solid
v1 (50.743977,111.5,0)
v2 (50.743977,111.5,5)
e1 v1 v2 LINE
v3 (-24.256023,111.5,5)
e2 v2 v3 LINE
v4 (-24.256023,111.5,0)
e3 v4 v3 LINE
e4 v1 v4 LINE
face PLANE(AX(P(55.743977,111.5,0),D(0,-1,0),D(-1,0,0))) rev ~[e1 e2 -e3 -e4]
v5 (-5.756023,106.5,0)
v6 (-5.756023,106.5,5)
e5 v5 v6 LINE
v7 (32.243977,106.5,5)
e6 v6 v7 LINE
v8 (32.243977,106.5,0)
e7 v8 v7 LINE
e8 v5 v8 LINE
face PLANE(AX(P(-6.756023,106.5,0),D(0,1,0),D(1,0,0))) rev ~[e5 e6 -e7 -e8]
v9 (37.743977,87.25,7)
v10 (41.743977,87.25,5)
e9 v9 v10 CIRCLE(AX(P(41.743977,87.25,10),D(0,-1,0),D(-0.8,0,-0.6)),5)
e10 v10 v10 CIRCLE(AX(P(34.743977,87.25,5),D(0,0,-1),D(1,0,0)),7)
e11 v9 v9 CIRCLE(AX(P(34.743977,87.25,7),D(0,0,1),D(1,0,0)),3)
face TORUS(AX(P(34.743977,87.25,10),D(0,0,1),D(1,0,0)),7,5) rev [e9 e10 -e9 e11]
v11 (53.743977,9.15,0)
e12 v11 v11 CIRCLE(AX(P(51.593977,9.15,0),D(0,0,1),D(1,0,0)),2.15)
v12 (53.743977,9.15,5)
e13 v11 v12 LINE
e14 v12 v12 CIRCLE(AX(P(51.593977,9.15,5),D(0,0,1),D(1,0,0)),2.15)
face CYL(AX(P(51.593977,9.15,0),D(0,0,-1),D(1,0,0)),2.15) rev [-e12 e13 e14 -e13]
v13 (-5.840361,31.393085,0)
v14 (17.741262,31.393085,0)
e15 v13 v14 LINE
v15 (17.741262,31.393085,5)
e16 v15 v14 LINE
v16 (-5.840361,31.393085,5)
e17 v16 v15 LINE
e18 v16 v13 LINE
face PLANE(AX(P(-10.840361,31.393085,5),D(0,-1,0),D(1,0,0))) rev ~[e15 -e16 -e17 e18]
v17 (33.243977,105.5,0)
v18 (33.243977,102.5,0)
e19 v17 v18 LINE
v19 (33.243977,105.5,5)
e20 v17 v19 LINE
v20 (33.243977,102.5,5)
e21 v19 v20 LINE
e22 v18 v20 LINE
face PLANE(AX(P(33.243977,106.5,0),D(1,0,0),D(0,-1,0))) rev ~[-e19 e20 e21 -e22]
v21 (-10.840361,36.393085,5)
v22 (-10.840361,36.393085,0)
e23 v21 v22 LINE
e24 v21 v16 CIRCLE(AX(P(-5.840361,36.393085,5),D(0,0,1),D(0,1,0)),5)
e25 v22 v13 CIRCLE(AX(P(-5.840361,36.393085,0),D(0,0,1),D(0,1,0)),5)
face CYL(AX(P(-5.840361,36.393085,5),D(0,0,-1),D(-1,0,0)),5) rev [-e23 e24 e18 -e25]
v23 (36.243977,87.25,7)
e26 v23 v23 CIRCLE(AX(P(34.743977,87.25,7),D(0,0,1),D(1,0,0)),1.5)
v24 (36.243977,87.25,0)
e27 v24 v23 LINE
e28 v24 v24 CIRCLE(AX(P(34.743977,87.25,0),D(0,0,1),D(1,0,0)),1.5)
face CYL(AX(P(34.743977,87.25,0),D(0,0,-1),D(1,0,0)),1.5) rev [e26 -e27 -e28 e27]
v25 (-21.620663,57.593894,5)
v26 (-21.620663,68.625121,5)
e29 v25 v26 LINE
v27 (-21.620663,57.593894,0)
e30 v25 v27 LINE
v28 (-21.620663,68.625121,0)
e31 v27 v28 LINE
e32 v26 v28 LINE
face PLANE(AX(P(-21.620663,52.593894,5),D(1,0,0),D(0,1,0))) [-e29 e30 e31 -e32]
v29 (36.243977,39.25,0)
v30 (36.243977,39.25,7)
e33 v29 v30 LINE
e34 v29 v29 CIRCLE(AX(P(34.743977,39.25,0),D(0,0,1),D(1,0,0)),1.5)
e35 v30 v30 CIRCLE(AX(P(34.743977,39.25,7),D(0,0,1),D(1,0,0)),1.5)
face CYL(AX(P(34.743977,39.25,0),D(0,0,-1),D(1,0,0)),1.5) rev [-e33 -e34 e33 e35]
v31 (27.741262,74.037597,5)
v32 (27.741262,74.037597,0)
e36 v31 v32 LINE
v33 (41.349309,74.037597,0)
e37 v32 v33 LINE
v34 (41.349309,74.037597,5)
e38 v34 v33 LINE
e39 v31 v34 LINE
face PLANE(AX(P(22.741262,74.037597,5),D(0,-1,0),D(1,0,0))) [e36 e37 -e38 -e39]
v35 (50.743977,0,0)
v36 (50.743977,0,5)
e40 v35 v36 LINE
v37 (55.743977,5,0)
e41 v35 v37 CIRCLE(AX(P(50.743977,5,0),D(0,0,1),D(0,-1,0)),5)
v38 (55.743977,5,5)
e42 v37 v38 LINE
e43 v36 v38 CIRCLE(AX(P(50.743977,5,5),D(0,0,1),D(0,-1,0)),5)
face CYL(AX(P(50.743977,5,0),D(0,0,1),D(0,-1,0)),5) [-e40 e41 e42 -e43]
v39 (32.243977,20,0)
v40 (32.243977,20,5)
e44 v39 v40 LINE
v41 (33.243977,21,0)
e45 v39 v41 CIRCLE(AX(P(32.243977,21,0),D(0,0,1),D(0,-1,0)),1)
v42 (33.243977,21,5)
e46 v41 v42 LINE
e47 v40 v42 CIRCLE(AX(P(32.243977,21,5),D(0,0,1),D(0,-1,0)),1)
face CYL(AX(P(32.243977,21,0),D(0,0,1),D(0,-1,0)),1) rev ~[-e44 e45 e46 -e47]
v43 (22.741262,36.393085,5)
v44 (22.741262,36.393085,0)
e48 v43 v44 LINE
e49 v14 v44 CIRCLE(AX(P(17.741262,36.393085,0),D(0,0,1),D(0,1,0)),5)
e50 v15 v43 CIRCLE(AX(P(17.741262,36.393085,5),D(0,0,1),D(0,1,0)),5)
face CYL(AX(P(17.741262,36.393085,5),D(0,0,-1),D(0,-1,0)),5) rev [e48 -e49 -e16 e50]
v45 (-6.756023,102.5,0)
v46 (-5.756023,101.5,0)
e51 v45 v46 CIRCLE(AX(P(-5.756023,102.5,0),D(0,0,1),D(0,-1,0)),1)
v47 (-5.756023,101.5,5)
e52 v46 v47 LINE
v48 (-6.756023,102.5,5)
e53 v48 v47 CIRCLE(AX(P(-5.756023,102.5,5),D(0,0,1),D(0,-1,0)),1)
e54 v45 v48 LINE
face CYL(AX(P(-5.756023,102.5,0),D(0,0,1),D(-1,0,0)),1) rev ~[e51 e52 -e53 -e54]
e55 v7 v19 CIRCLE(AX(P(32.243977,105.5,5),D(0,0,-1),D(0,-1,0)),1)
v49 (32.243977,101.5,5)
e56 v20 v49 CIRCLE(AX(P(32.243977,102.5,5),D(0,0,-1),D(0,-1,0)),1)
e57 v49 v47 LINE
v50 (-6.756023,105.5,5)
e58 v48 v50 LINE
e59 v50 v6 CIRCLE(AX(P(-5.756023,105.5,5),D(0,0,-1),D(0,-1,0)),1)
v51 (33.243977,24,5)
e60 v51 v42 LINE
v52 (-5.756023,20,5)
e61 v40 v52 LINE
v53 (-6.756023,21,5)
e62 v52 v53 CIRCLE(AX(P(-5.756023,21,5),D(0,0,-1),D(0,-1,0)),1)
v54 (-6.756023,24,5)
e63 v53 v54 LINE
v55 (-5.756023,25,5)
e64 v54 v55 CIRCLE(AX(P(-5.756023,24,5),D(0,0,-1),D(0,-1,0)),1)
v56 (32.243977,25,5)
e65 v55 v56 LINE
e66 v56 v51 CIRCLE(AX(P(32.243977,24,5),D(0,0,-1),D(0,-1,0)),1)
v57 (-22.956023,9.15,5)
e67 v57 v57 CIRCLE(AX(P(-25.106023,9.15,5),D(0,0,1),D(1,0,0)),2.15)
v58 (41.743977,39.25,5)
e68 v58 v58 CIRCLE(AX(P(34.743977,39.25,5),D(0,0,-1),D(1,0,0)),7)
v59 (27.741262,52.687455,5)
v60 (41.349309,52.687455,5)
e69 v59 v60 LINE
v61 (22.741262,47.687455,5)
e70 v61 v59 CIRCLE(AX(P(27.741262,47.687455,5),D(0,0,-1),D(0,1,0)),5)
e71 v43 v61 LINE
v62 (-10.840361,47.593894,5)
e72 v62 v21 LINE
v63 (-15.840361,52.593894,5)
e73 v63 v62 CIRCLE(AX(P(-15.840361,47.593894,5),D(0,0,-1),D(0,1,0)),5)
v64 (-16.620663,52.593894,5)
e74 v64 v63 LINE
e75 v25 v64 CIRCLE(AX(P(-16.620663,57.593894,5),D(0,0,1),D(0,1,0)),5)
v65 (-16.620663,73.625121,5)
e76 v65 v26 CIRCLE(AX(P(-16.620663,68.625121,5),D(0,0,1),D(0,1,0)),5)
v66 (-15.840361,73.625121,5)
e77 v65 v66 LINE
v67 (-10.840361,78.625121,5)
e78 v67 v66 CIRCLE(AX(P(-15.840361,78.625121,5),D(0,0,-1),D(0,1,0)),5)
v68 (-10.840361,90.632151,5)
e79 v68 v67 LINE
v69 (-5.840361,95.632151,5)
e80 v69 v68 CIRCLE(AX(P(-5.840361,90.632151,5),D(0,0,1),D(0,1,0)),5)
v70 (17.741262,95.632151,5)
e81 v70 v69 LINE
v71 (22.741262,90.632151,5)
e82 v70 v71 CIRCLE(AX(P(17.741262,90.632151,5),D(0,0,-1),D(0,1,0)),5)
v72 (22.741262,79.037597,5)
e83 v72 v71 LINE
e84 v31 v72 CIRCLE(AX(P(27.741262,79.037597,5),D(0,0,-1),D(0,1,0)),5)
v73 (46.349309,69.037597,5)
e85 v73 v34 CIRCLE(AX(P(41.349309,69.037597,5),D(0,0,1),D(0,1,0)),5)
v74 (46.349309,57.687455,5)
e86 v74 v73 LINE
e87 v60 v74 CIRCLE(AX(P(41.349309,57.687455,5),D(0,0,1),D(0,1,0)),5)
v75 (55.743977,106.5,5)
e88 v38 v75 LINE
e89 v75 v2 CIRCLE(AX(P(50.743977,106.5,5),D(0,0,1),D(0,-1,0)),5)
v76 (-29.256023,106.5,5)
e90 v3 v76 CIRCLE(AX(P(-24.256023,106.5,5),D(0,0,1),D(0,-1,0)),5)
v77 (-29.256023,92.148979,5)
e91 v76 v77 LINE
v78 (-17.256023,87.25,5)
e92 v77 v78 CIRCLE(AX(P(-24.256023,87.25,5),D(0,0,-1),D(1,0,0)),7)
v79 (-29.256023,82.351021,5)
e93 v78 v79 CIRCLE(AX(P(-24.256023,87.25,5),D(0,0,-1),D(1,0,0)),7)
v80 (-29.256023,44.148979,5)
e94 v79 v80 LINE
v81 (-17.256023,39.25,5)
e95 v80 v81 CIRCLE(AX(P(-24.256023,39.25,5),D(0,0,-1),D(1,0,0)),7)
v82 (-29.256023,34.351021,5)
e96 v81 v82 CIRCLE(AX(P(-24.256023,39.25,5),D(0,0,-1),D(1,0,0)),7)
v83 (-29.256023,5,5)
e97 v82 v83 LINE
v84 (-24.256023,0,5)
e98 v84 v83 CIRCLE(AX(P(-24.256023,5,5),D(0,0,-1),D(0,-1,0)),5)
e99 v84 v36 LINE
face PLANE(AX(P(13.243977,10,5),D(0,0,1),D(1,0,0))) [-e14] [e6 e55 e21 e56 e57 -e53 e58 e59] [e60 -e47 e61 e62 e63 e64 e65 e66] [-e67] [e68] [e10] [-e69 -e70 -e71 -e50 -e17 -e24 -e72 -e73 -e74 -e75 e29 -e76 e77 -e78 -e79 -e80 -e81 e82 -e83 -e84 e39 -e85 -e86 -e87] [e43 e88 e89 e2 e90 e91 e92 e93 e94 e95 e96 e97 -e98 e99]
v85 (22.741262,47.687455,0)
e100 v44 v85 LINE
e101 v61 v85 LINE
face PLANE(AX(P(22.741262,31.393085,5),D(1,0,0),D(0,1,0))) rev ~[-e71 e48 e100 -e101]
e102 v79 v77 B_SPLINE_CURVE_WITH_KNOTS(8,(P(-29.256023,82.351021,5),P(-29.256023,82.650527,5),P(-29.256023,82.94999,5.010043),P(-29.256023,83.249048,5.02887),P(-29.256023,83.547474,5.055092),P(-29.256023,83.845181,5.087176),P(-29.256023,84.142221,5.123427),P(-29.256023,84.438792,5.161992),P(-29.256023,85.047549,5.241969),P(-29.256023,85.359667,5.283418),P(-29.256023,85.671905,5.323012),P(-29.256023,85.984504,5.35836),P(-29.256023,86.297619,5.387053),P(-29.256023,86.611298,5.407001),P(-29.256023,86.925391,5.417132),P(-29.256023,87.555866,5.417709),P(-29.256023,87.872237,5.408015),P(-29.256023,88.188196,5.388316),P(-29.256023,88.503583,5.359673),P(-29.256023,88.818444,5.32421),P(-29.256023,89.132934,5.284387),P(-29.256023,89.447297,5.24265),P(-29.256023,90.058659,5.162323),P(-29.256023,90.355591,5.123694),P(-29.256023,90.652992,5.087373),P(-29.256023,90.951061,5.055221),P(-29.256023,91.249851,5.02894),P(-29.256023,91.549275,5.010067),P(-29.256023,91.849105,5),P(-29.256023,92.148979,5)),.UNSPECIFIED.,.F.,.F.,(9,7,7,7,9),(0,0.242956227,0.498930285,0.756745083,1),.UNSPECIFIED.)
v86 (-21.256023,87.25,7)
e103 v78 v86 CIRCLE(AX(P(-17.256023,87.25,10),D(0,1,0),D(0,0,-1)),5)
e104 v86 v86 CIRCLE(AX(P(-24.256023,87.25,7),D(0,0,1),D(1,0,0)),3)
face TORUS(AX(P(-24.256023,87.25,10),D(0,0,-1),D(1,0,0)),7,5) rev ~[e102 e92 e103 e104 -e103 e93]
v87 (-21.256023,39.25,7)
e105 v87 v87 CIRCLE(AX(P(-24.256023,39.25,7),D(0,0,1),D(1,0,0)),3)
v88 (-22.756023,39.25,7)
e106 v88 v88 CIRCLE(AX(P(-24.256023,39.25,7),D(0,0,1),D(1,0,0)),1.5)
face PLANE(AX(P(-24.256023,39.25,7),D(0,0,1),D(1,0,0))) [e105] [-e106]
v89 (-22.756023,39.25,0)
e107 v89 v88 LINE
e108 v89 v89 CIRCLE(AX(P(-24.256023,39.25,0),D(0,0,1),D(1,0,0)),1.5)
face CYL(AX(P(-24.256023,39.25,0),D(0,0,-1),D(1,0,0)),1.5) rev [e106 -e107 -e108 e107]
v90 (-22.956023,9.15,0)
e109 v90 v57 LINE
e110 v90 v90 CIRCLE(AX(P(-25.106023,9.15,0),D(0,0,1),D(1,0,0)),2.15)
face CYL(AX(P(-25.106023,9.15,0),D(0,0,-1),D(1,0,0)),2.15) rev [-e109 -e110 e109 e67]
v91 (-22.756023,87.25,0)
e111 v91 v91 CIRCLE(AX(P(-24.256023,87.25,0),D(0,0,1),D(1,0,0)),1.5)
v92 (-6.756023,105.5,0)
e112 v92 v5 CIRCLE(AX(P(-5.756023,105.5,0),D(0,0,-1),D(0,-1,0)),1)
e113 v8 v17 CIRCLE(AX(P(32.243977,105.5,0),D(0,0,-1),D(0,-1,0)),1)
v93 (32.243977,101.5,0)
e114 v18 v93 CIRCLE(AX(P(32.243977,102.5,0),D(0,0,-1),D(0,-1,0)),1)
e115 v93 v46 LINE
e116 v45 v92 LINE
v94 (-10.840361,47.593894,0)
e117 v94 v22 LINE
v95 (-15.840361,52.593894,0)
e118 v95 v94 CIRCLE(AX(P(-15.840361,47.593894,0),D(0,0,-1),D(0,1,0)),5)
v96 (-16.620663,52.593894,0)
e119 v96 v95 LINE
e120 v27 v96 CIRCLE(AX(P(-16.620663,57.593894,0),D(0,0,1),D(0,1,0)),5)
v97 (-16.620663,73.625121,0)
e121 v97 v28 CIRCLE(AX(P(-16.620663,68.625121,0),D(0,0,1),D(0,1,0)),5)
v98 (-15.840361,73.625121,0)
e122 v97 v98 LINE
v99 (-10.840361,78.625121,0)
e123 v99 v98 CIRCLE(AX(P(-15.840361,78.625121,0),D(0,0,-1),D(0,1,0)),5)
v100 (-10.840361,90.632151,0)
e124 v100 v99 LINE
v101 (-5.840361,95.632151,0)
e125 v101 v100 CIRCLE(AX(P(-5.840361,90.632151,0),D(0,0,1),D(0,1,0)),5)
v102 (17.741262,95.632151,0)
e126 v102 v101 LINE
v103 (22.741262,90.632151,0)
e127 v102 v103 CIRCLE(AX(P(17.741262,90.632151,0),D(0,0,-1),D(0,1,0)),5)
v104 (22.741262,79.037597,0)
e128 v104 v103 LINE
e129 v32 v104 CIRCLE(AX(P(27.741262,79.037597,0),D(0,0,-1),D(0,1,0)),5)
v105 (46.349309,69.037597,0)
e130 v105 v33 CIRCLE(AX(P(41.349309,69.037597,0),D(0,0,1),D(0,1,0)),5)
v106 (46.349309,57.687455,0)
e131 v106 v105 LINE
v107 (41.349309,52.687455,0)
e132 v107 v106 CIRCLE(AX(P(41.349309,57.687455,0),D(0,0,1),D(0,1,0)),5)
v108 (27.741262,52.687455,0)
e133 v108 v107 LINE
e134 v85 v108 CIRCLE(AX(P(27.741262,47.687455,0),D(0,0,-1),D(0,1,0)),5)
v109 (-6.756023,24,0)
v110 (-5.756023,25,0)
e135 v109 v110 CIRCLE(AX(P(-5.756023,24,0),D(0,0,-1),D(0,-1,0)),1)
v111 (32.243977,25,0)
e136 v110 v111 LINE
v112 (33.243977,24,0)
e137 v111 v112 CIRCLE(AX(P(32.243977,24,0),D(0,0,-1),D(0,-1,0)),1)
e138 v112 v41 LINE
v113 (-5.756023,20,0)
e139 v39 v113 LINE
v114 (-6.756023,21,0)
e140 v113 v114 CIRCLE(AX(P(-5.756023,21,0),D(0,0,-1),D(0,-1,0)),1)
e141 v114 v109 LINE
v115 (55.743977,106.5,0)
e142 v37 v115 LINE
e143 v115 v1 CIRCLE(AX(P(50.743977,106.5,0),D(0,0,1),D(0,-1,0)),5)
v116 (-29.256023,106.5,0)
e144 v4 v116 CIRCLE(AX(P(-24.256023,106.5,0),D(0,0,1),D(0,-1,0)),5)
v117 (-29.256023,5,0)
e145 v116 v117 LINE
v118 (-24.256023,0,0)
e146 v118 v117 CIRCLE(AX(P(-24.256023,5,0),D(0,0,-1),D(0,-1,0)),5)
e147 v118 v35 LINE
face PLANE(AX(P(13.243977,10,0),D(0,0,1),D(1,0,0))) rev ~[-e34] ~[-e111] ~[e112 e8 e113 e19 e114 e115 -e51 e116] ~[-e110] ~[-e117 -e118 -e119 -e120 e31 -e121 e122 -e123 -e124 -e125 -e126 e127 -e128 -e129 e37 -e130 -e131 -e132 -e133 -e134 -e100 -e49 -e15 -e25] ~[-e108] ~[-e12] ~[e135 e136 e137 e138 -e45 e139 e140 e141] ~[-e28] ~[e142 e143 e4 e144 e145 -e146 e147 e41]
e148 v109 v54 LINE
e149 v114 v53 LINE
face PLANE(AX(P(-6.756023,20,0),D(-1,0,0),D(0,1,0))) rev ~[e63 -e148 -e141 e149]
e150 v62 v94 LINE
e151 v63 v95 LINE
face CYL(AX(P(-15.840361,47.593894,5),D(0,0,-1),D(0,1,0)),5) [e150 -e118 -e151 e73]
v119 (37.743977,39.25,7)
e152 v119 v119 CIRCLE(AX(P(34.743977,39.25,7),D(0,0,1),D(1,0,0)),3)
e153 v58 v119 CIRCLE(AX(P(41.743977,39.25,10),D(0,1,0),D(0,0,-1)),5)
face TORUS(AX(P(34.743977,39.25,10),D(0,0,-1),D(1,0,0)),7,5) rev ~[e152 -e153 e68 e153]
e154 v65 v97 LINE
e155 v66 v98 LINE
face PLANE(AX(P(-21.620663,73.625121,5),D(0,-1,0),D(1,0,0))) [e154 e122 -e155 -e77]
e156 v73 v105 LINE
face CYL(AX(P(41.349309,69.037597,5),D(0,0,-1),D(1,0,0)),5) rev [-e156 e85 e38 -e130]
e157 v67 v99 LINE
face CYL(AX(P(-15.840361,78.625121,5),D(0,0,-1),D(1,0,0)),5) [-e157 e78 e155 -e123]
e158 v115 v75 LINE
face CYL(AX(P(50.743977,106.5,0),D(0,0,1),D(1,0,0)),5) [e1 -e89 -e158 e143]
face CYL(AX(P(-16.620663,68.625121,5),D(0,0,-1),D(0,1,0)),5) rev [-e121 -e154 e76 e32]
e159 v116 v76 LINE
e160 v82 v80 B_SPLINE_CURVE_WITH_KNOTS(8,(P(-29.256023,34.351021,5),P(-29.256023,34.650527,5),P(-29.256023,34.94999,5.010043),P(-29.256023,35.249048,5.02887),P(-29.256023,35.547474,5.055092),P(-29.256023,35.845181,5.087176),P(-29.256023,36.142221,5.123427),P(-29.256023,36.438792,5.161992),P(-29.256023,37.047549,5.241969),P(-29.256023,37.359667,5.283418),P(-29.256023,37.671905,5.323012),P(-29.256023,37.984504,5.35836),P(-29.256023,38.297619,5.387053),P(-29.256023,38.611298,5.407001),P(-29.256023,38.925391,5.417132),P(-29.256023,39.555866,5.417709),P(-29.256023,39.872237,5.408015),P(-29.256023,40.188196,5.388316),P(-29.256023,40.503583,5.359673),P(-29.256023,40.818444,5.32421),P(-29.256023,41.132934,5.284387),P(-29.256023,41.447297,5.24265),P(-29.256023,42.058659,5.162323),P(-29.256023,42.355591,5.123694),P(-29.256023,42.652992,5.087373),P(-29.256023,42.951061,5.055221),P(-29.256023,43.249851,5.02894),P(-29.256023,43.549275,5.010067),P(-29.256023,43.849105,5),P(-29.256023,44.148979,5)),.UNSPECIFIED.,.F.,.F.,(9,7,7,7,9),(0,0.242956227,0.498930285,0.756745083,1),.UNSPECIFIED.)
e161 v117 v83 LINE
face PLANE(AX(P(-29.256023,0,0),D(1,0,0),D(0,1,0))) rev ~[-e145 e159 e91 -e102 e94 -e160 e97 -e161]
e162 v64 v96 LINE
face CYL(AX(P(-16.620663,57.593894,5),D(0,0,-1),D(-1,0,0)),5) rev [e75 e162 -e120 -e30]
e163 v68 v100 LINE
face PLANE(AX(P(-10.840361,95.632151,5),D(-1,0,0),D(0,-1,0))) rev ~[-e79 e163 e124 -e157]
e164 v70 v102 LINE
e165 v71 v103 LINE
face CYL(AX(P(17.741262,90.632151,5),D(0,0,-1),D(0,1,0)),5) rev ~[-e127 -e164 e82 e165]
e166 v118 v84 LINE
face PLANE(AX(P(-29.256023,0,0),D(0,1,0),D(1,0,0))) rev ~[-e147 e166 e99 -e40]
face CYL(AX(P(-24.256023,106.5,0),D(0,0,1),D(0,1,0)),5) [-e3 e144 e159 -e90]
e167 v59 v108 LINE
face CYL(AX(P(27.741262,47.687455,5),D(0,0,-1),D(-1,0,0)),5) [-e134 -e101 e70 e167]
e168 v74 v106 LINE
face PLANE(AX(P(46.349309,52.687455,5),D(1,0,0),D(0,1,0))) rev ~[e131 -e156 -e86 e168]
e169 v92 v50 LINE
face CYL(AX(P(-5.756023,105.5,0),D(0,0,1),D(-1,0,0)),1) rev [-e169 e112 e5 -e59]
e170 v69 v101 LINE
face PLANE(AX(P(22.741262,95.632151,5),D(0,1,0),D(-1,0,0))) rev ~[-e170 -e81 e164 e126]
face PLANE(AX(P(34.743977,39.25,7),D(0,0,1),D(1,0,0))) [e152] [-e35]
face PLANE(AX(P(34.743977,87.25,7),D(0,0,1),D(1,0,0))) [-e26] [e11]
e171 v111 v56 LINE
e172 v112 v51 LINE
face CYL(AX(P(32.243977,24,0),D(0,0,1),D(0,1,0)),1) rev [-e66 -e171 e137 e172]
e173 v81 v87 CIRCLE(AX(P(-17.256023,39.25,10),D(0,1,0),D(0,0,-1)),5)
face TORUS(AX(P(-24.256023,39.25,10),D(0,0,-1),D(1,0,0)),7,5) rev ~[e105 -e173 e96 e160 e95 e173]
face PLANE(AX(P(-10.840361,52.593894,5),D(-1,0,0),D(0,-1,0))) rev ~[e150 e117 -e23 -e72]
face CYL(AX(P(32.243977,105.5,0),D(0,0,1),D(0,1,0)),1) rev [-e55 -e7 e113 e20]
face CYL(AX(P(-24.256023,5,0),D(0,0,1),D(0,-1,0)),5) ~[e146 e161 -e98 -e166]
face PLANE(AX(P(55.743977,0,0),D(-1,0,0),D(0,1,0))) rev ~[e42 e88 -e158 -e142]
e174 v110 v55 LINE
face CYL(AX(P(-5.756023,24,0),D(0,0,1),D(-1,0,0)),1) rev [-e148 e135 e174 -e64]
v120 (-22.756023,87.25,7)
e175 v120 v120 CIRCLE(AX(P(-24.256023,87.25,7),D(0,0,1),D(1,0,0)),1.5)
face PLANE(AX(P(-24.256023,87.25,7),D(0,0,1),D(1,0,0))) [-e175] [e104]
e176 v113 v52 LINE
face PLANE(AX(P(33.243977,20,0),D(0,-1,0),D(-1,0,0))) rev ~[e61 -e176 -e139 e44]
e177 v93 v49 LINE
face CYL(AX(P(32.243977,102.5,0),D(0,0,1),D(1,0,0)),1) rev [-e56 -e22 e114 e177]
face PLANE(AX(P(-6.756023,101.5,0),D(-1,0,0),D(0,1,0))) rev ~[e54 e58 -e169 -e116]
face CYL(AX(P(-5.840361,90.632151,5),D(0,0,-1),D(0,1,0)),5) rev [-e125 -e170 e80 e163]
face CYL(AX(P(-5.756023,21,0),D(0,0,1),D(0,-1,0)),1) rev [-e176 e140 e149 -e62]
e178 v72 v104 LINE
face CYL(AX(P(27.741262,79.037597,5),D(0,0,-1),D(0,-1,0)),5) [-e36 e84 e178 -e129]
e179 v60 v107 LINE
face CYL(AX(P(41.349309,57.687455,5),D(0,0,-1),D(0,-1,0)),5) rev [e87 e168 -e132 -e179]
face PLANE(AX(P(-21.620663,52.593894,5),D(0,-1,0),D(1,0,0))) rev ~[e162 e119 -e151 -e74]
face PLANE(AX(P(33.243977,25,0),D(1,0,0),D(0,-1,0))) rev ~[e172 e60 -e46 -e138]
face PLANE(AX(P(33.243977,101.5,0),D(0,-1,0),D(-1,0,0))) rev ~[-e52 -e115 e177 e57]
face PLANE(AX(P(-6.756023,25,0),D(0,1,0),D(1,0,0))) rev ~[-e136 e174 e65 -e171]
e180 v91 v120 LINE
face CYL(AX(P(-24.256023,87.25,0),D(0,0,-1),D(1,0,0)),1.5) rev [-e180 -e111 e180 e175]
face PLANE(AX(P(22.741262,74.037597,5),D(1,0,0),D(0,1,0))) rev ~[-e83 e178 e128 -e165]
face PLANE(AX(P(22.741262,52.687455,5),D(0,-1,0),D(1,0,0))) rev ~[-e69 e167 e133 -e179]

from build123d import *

# Parameters (mm, degrees)
F0_R     = 2.15
F0_R_2   = 3
F0_R_3   = 1.5
F0_R_4   = 5
F1_DEPTH = 5
F2_R     = 1
F3_R     = 5
F4_DEPTH = 7
F6_W     = 10.780302342
F6_H     = 21.0312269628
F6_W_2   = 23.6080475152
F6_H_2   = 21.3501416147
F7_DEPTH = 25
F8_R     = 5


# Not quite as in the source:
# - a fillet or chamfer that OpenCascade refuses, or shapes differently, is made with other operations: its cross-section is extruded or revolved along the edge and cut away or added


with BuildPart() as f1:
    # F0 (on Top) → F1 (new body)
    with BuildSketch(Plane.XY):
        Polygon((-29.2560231508, 20), (-29.2560231508, 0), (55.7439768492, 0), (55.7439768492, 20), (33.2439768492, 20), (-6.7560231508, 20), align=None)
        with Locations((-25.1060231508, 9.15)):
            Circle(F0_R, mode=Mode.SUBTRACT)
        with Locations((51.5939768492, 9.15)):
            Circle(F0_R, mode=Mode.SUBTRACT)
        Polygon((-29.2560231508, 106.5), (-29.2560231508, 20), (-6.7560231508, 20), (-6.7560231508, 25), (33.2439768492, 25), (33.2439768492, 20), (55.7439768492, 20), (55.7439768492, 106.5), (33.2439768492, 106.5), (33.2439768492, 101.5), (-6.7560231508, 101.5), (-6.7560231508, 106.5), align=None)
        with Locations((-24.2560231508, 39.25)):
            Circle(F0_R_2, mode=Mode.SUBTRACT)
        with Locations((3.2439768492, 53.25)):
            Circle(F0_R_3, mode=Mode.SUBTRACT)
        with Locations((23.2439768492, 53.25)):
            Circle(F0_R_3, mode=Mode.SUBTRACT)
        with Locations((34.7439768492, 39.25)):
            Circle(F0_R_2, mode=Mode.SUBTRACT)
        with Locations((13.2439768492, 63.25)):
            Circle(F0_R_4, mode=Mode.SUBTRACT)
        with Locations((3.2439768492, 73.25)):
            Circle(F0_R_3, mode=Mode.SUBTRACT)
        with Locations((-24.2560231508, 87.25)):
            Circle(F0_R_2, mode=Mode.SUBTRACT)
        with Locations((23.2439768492, 73.25)):
            Circle(F0_R_3, mode=Mode.SUBTRACT)
        with Locations((34.7439768492, 87.25)):
            Circle(F0_R_2, mode=Mode.SUBTRACT)
        Polygon((-29.2560231508, 111.5), (-29.2560231508, 106.5), (-6.7560231508, 106.5), (33.2439768492, 106.5), (55.7439768492, 106.5), (55.7439768492, 111.5), align=None)
        with Locations((-24.2560231508, 39.25)):
            Circle(F0_R_2)
        with Locations((-24.2560231508, 39.25)):
            Circle(F0_R_3, mode=Mode.SUBTRACT)
        with Locations((-24.2560231508, 87.25)):
            Circle(F0_R_2)
        with Locations((-24.2560231508, 87.25)):
            Circle(F0_R_3, mode=Mode.SUBTRACT)
        with Locations((34.7439768492, 39.25)):
            Circle(F0_R_2)
        with Locations((34.7439768492, 39.25)):
            Circle(F0_R_3, mode=Mode.SUBTRACT)
        with Locations((34.7439768492, 87.25)):
            Circle(F0_R_2)
        with Locations((34.7439768492, 87.25)):
            Circle(F0_R_3, mode=Mode.SUBTRACT)
        with Locations((13.2439768492, 63.25)):
            Circle(F0_R_4)
        with Locations((3.2439768492, 73.25)):
            Circle(F0_R_3)
        with Locations((3.2439768492, 53.25)):
            Circle(F0_R_3)
        with Locations((23.2439768492, 53.25)):
            Circle(F0_R_3)
        with Locations((23.2439768492, 73.25)):
            Circle(F0_R_3)
    extrude(amount=F1_DEPTH)

    # F2
    f2_edges = [f1.edges().sort_by_distance(p)[0] for p in [
        (-6.756023, 25, 2.5),
        (33.243977, 25, 2.5),
        (-6.756023, 20, 2.5),
        (33.243977, 20, 2.5),
        (-6.756023, 101.5, 2.5),
        (-6.756023, 106.5, 2.5),
        (33.243977, 106.5, 2.5),
        (33.243977, 101.5, 2.5),
    ]]
    fillet(f2_edges, radius=F2_R)

    # F3
    f3_edges = [f1.edges().sort_by_distance(p)[0] for p in [
        (-29.256023, 0, 2.5),
        (55.743977, 0, 2.5),
        (55.743977, 111.5, 2.5),
        (-29.256023, 111.5, 2.5),
    ]]
    fillet(f3_edges, radius=F3_R)

    # F0 (on Top) → F4 (join)
    with BuildSketch(Plane.XY):
        with Locations((-24.2560231508, 87.25)):
            Circle(F0_R_2)
        with Locations((-24.2560231508, 87.25)):
            Circle(F0_R_3, mode=Mode.SUBTRACT)
        with Locations((-24.2560231508, 39.25)):
            Circle(F0_R_2)
        with Locations((-24.2560231508, 39.25)):
            Circle(F0_R_3, mode=Mode.SUBTRACT)
        with Locations((34.7439768492, 87.25)):
            Circle(F0_R_2)
        with Locations((34.7439768492, 87.25)):
            Circle(F0_R_3, mode=Mode.SUBTRACT)
        with Locations((34.7439768492, 39.25)):
            Circle(F0_R_2)
        with Locations((34.7439768492, 39.25)):
            Circle(F0_R_3, mode=Mode.SUBTRACT)
    extrude(amount=F4_DEPTH)

    # F5: fillet of radius 5 on 4 edges, made by hand


with BuildPart() as f5_tool2:
    # F5_s3 → F5_t4 (revolve)
    with BuildSketch(Plane.XZ.offset(-87.25)):
        with BuildLine():
            ThreePointArc((-17.2560231508, 5), (-19.4920911283, 5.527864045), (-21.2560231508, 7))
            Line((-21.2560231508, 7), (-21.3360231508, 6.94))
            ThreePointArc((-21.3360231508, 6.94), (-21.3560231508, 6), (-21.3560231508, 5))
            Line((-21.3560231508, 5), (-21.2560231508, 4.9))
            Line((-21.2560231508, 4.9), (-17.2560231508, 4.9))
            Line((-17.2560231508, 4.9), (-17.2560231508, 5))
        make_face()
    revolve(axis=Axis((-24.2560231508, 87.25, 5), (0, 0, -1)))

    split(bisect_by=Plane.YZ.offset(-29.2560231508), keep=Keep.TOP)


with BuildPart() as f1_1:
    add(f1.part)

    # F5_t1: union F5_tool2
    add(f5_tool2.part)


with BuildPart() as f5_tool7:
    # F5_s8 → F5_t9 (revolve)
    with BuildSketch(Plane.XZ.offset(-39.25)):
        with BuildLine():
            ThreePointArc((-17.2560231508, 5), (-19.4920911283, 5.527864045), (-21.2560231508, 7))
            Line((-21.2560231508, 7), (-21.3360231508, 6.94))
            ThreePointArc((-21.3360231508, 6.94), (-21.3560231508, 6), (-21.3560231508, 5))
            Line((-21.3560231508, 5), (-21.2560231508, 4.9))
            Line((-21.2560231508, 4.9), (-17.2560231508, 4.9))
            Line((-17.2560231508, 4.9), (-17.2560231508, 5))
        make_face()
    revolve(axis=Axis((-24.2560231508, 39.25, 5), (0, 0, -1)))

    split(bisect_by=Plane.YZ.offset(-29.2560231508), keep=Keep.TOP)


with BuildPart() as f1_2:
    add(f1_1.part)

    # F5_t6: union F5_tool7
    add(f5_tool7.part)

    # F5_s11 → F5_t12 (revolve)
    with BuildSketch(Plane.XZ.offset(-39.25)):
        with BuildLine():
            ThreePointArc((41.7439768492, 5), (39.5079088717, 5.527864045), (37.7439768492, 7))
            Line((37.7439768492, 7), (37.6639768492, 6.94))
            ThreePointArc((37.6639768492, 6.94), (37.6439768492, 6), (37.6439768492, 5))
            Line((37.6439768492, 5), (37.7439768492, 4.9))
            Line((37.7439768492, 4.9), (41.7439768492, 4.9))
            Line((41.7439768492, 4.9), (41.7439768492, 5))
        make_face()
    revolve(axis=Axis((34.7439768492, 39.25, 5), (0, 0, -1)))

    # F5_s13 → F5_t14 (revolve)
    with BuildSketch(Plane.XZ.offset(-87.25)):
        with BuildLine():
            ThreePointArc((37.7439768492, 7), (39.5079088717, 5.527864045), (41.7439768492, 5))
            Line((41.7439768492, 5), (41.7439768492, 4.9))
            Line((41.7439768492, 4.9), (37.7439768492, 4.9))
            Line((37.7439768492, 4.9), (37.6439768492, 5))
            ThreePointArc((37.6439768492, 5), (37.6439768492, 6), (37.6639768492, 6.94))
            Line((37.6639768492, 6.94), (37.7439768492, 7))
        make_face()
    revolve(axis=Axis((34.7439768492, 87.25, 5), (0, 0, -1)))

    # F6 (on face) → F7 (cut)
    with BuildSketch(Plane.XY.offset(5)):
        Polygon((22.7412616368, 95.6321507692), (-10.8403607737, 95.6321507692), (-10.8403607737, 73.6251212656), (-10.8403607737, 52.5938943028), (-10.8403607737, 31.3930846751), (22.7412616368, 31.3930846751), (22.7412616368, 52.6874549687), (22.7412616368, 74.0375965834), align=None)
        with Locations((-16.2305119447, 63.1095077842)):
            Rectangle(F6_W, F6_H)
        with Locations((34.5452853944, 63.362525776)):
            Rectangle(F6_W_2, F6_H_2)
    extrude(amount=-F7_DEPTH, mode=Mode.SUBTRACT)

    # F8
    f8_edges = [f1_2.edges().sort_by_distance(p)[0] for p in [
        (-10.840361, 73.625121, 2.5),
        (22.741262, 74.037597, 2.5),
        (22.741262, 52.687455, 2.5),
        (-10.840361, 52.593894, 2.5),
        (-21.620663, 52.593894, 2.5),
        (-21.620663, 73.625121, 2.5),
        (-10.840361, 95.632151, 2.5),
        (22.741262, 95.632151, 2.5),
        (46.349309, 74.037597, 2.5),
        (46.349309, 52.687455, 2.5),
        (22.741262, 31.393085, 2.5),
        (-10.840361, 31.393085, 2.5),
    ]]
    fillet(f8_edges, radius=F8_R)


solid = f1_2.part
